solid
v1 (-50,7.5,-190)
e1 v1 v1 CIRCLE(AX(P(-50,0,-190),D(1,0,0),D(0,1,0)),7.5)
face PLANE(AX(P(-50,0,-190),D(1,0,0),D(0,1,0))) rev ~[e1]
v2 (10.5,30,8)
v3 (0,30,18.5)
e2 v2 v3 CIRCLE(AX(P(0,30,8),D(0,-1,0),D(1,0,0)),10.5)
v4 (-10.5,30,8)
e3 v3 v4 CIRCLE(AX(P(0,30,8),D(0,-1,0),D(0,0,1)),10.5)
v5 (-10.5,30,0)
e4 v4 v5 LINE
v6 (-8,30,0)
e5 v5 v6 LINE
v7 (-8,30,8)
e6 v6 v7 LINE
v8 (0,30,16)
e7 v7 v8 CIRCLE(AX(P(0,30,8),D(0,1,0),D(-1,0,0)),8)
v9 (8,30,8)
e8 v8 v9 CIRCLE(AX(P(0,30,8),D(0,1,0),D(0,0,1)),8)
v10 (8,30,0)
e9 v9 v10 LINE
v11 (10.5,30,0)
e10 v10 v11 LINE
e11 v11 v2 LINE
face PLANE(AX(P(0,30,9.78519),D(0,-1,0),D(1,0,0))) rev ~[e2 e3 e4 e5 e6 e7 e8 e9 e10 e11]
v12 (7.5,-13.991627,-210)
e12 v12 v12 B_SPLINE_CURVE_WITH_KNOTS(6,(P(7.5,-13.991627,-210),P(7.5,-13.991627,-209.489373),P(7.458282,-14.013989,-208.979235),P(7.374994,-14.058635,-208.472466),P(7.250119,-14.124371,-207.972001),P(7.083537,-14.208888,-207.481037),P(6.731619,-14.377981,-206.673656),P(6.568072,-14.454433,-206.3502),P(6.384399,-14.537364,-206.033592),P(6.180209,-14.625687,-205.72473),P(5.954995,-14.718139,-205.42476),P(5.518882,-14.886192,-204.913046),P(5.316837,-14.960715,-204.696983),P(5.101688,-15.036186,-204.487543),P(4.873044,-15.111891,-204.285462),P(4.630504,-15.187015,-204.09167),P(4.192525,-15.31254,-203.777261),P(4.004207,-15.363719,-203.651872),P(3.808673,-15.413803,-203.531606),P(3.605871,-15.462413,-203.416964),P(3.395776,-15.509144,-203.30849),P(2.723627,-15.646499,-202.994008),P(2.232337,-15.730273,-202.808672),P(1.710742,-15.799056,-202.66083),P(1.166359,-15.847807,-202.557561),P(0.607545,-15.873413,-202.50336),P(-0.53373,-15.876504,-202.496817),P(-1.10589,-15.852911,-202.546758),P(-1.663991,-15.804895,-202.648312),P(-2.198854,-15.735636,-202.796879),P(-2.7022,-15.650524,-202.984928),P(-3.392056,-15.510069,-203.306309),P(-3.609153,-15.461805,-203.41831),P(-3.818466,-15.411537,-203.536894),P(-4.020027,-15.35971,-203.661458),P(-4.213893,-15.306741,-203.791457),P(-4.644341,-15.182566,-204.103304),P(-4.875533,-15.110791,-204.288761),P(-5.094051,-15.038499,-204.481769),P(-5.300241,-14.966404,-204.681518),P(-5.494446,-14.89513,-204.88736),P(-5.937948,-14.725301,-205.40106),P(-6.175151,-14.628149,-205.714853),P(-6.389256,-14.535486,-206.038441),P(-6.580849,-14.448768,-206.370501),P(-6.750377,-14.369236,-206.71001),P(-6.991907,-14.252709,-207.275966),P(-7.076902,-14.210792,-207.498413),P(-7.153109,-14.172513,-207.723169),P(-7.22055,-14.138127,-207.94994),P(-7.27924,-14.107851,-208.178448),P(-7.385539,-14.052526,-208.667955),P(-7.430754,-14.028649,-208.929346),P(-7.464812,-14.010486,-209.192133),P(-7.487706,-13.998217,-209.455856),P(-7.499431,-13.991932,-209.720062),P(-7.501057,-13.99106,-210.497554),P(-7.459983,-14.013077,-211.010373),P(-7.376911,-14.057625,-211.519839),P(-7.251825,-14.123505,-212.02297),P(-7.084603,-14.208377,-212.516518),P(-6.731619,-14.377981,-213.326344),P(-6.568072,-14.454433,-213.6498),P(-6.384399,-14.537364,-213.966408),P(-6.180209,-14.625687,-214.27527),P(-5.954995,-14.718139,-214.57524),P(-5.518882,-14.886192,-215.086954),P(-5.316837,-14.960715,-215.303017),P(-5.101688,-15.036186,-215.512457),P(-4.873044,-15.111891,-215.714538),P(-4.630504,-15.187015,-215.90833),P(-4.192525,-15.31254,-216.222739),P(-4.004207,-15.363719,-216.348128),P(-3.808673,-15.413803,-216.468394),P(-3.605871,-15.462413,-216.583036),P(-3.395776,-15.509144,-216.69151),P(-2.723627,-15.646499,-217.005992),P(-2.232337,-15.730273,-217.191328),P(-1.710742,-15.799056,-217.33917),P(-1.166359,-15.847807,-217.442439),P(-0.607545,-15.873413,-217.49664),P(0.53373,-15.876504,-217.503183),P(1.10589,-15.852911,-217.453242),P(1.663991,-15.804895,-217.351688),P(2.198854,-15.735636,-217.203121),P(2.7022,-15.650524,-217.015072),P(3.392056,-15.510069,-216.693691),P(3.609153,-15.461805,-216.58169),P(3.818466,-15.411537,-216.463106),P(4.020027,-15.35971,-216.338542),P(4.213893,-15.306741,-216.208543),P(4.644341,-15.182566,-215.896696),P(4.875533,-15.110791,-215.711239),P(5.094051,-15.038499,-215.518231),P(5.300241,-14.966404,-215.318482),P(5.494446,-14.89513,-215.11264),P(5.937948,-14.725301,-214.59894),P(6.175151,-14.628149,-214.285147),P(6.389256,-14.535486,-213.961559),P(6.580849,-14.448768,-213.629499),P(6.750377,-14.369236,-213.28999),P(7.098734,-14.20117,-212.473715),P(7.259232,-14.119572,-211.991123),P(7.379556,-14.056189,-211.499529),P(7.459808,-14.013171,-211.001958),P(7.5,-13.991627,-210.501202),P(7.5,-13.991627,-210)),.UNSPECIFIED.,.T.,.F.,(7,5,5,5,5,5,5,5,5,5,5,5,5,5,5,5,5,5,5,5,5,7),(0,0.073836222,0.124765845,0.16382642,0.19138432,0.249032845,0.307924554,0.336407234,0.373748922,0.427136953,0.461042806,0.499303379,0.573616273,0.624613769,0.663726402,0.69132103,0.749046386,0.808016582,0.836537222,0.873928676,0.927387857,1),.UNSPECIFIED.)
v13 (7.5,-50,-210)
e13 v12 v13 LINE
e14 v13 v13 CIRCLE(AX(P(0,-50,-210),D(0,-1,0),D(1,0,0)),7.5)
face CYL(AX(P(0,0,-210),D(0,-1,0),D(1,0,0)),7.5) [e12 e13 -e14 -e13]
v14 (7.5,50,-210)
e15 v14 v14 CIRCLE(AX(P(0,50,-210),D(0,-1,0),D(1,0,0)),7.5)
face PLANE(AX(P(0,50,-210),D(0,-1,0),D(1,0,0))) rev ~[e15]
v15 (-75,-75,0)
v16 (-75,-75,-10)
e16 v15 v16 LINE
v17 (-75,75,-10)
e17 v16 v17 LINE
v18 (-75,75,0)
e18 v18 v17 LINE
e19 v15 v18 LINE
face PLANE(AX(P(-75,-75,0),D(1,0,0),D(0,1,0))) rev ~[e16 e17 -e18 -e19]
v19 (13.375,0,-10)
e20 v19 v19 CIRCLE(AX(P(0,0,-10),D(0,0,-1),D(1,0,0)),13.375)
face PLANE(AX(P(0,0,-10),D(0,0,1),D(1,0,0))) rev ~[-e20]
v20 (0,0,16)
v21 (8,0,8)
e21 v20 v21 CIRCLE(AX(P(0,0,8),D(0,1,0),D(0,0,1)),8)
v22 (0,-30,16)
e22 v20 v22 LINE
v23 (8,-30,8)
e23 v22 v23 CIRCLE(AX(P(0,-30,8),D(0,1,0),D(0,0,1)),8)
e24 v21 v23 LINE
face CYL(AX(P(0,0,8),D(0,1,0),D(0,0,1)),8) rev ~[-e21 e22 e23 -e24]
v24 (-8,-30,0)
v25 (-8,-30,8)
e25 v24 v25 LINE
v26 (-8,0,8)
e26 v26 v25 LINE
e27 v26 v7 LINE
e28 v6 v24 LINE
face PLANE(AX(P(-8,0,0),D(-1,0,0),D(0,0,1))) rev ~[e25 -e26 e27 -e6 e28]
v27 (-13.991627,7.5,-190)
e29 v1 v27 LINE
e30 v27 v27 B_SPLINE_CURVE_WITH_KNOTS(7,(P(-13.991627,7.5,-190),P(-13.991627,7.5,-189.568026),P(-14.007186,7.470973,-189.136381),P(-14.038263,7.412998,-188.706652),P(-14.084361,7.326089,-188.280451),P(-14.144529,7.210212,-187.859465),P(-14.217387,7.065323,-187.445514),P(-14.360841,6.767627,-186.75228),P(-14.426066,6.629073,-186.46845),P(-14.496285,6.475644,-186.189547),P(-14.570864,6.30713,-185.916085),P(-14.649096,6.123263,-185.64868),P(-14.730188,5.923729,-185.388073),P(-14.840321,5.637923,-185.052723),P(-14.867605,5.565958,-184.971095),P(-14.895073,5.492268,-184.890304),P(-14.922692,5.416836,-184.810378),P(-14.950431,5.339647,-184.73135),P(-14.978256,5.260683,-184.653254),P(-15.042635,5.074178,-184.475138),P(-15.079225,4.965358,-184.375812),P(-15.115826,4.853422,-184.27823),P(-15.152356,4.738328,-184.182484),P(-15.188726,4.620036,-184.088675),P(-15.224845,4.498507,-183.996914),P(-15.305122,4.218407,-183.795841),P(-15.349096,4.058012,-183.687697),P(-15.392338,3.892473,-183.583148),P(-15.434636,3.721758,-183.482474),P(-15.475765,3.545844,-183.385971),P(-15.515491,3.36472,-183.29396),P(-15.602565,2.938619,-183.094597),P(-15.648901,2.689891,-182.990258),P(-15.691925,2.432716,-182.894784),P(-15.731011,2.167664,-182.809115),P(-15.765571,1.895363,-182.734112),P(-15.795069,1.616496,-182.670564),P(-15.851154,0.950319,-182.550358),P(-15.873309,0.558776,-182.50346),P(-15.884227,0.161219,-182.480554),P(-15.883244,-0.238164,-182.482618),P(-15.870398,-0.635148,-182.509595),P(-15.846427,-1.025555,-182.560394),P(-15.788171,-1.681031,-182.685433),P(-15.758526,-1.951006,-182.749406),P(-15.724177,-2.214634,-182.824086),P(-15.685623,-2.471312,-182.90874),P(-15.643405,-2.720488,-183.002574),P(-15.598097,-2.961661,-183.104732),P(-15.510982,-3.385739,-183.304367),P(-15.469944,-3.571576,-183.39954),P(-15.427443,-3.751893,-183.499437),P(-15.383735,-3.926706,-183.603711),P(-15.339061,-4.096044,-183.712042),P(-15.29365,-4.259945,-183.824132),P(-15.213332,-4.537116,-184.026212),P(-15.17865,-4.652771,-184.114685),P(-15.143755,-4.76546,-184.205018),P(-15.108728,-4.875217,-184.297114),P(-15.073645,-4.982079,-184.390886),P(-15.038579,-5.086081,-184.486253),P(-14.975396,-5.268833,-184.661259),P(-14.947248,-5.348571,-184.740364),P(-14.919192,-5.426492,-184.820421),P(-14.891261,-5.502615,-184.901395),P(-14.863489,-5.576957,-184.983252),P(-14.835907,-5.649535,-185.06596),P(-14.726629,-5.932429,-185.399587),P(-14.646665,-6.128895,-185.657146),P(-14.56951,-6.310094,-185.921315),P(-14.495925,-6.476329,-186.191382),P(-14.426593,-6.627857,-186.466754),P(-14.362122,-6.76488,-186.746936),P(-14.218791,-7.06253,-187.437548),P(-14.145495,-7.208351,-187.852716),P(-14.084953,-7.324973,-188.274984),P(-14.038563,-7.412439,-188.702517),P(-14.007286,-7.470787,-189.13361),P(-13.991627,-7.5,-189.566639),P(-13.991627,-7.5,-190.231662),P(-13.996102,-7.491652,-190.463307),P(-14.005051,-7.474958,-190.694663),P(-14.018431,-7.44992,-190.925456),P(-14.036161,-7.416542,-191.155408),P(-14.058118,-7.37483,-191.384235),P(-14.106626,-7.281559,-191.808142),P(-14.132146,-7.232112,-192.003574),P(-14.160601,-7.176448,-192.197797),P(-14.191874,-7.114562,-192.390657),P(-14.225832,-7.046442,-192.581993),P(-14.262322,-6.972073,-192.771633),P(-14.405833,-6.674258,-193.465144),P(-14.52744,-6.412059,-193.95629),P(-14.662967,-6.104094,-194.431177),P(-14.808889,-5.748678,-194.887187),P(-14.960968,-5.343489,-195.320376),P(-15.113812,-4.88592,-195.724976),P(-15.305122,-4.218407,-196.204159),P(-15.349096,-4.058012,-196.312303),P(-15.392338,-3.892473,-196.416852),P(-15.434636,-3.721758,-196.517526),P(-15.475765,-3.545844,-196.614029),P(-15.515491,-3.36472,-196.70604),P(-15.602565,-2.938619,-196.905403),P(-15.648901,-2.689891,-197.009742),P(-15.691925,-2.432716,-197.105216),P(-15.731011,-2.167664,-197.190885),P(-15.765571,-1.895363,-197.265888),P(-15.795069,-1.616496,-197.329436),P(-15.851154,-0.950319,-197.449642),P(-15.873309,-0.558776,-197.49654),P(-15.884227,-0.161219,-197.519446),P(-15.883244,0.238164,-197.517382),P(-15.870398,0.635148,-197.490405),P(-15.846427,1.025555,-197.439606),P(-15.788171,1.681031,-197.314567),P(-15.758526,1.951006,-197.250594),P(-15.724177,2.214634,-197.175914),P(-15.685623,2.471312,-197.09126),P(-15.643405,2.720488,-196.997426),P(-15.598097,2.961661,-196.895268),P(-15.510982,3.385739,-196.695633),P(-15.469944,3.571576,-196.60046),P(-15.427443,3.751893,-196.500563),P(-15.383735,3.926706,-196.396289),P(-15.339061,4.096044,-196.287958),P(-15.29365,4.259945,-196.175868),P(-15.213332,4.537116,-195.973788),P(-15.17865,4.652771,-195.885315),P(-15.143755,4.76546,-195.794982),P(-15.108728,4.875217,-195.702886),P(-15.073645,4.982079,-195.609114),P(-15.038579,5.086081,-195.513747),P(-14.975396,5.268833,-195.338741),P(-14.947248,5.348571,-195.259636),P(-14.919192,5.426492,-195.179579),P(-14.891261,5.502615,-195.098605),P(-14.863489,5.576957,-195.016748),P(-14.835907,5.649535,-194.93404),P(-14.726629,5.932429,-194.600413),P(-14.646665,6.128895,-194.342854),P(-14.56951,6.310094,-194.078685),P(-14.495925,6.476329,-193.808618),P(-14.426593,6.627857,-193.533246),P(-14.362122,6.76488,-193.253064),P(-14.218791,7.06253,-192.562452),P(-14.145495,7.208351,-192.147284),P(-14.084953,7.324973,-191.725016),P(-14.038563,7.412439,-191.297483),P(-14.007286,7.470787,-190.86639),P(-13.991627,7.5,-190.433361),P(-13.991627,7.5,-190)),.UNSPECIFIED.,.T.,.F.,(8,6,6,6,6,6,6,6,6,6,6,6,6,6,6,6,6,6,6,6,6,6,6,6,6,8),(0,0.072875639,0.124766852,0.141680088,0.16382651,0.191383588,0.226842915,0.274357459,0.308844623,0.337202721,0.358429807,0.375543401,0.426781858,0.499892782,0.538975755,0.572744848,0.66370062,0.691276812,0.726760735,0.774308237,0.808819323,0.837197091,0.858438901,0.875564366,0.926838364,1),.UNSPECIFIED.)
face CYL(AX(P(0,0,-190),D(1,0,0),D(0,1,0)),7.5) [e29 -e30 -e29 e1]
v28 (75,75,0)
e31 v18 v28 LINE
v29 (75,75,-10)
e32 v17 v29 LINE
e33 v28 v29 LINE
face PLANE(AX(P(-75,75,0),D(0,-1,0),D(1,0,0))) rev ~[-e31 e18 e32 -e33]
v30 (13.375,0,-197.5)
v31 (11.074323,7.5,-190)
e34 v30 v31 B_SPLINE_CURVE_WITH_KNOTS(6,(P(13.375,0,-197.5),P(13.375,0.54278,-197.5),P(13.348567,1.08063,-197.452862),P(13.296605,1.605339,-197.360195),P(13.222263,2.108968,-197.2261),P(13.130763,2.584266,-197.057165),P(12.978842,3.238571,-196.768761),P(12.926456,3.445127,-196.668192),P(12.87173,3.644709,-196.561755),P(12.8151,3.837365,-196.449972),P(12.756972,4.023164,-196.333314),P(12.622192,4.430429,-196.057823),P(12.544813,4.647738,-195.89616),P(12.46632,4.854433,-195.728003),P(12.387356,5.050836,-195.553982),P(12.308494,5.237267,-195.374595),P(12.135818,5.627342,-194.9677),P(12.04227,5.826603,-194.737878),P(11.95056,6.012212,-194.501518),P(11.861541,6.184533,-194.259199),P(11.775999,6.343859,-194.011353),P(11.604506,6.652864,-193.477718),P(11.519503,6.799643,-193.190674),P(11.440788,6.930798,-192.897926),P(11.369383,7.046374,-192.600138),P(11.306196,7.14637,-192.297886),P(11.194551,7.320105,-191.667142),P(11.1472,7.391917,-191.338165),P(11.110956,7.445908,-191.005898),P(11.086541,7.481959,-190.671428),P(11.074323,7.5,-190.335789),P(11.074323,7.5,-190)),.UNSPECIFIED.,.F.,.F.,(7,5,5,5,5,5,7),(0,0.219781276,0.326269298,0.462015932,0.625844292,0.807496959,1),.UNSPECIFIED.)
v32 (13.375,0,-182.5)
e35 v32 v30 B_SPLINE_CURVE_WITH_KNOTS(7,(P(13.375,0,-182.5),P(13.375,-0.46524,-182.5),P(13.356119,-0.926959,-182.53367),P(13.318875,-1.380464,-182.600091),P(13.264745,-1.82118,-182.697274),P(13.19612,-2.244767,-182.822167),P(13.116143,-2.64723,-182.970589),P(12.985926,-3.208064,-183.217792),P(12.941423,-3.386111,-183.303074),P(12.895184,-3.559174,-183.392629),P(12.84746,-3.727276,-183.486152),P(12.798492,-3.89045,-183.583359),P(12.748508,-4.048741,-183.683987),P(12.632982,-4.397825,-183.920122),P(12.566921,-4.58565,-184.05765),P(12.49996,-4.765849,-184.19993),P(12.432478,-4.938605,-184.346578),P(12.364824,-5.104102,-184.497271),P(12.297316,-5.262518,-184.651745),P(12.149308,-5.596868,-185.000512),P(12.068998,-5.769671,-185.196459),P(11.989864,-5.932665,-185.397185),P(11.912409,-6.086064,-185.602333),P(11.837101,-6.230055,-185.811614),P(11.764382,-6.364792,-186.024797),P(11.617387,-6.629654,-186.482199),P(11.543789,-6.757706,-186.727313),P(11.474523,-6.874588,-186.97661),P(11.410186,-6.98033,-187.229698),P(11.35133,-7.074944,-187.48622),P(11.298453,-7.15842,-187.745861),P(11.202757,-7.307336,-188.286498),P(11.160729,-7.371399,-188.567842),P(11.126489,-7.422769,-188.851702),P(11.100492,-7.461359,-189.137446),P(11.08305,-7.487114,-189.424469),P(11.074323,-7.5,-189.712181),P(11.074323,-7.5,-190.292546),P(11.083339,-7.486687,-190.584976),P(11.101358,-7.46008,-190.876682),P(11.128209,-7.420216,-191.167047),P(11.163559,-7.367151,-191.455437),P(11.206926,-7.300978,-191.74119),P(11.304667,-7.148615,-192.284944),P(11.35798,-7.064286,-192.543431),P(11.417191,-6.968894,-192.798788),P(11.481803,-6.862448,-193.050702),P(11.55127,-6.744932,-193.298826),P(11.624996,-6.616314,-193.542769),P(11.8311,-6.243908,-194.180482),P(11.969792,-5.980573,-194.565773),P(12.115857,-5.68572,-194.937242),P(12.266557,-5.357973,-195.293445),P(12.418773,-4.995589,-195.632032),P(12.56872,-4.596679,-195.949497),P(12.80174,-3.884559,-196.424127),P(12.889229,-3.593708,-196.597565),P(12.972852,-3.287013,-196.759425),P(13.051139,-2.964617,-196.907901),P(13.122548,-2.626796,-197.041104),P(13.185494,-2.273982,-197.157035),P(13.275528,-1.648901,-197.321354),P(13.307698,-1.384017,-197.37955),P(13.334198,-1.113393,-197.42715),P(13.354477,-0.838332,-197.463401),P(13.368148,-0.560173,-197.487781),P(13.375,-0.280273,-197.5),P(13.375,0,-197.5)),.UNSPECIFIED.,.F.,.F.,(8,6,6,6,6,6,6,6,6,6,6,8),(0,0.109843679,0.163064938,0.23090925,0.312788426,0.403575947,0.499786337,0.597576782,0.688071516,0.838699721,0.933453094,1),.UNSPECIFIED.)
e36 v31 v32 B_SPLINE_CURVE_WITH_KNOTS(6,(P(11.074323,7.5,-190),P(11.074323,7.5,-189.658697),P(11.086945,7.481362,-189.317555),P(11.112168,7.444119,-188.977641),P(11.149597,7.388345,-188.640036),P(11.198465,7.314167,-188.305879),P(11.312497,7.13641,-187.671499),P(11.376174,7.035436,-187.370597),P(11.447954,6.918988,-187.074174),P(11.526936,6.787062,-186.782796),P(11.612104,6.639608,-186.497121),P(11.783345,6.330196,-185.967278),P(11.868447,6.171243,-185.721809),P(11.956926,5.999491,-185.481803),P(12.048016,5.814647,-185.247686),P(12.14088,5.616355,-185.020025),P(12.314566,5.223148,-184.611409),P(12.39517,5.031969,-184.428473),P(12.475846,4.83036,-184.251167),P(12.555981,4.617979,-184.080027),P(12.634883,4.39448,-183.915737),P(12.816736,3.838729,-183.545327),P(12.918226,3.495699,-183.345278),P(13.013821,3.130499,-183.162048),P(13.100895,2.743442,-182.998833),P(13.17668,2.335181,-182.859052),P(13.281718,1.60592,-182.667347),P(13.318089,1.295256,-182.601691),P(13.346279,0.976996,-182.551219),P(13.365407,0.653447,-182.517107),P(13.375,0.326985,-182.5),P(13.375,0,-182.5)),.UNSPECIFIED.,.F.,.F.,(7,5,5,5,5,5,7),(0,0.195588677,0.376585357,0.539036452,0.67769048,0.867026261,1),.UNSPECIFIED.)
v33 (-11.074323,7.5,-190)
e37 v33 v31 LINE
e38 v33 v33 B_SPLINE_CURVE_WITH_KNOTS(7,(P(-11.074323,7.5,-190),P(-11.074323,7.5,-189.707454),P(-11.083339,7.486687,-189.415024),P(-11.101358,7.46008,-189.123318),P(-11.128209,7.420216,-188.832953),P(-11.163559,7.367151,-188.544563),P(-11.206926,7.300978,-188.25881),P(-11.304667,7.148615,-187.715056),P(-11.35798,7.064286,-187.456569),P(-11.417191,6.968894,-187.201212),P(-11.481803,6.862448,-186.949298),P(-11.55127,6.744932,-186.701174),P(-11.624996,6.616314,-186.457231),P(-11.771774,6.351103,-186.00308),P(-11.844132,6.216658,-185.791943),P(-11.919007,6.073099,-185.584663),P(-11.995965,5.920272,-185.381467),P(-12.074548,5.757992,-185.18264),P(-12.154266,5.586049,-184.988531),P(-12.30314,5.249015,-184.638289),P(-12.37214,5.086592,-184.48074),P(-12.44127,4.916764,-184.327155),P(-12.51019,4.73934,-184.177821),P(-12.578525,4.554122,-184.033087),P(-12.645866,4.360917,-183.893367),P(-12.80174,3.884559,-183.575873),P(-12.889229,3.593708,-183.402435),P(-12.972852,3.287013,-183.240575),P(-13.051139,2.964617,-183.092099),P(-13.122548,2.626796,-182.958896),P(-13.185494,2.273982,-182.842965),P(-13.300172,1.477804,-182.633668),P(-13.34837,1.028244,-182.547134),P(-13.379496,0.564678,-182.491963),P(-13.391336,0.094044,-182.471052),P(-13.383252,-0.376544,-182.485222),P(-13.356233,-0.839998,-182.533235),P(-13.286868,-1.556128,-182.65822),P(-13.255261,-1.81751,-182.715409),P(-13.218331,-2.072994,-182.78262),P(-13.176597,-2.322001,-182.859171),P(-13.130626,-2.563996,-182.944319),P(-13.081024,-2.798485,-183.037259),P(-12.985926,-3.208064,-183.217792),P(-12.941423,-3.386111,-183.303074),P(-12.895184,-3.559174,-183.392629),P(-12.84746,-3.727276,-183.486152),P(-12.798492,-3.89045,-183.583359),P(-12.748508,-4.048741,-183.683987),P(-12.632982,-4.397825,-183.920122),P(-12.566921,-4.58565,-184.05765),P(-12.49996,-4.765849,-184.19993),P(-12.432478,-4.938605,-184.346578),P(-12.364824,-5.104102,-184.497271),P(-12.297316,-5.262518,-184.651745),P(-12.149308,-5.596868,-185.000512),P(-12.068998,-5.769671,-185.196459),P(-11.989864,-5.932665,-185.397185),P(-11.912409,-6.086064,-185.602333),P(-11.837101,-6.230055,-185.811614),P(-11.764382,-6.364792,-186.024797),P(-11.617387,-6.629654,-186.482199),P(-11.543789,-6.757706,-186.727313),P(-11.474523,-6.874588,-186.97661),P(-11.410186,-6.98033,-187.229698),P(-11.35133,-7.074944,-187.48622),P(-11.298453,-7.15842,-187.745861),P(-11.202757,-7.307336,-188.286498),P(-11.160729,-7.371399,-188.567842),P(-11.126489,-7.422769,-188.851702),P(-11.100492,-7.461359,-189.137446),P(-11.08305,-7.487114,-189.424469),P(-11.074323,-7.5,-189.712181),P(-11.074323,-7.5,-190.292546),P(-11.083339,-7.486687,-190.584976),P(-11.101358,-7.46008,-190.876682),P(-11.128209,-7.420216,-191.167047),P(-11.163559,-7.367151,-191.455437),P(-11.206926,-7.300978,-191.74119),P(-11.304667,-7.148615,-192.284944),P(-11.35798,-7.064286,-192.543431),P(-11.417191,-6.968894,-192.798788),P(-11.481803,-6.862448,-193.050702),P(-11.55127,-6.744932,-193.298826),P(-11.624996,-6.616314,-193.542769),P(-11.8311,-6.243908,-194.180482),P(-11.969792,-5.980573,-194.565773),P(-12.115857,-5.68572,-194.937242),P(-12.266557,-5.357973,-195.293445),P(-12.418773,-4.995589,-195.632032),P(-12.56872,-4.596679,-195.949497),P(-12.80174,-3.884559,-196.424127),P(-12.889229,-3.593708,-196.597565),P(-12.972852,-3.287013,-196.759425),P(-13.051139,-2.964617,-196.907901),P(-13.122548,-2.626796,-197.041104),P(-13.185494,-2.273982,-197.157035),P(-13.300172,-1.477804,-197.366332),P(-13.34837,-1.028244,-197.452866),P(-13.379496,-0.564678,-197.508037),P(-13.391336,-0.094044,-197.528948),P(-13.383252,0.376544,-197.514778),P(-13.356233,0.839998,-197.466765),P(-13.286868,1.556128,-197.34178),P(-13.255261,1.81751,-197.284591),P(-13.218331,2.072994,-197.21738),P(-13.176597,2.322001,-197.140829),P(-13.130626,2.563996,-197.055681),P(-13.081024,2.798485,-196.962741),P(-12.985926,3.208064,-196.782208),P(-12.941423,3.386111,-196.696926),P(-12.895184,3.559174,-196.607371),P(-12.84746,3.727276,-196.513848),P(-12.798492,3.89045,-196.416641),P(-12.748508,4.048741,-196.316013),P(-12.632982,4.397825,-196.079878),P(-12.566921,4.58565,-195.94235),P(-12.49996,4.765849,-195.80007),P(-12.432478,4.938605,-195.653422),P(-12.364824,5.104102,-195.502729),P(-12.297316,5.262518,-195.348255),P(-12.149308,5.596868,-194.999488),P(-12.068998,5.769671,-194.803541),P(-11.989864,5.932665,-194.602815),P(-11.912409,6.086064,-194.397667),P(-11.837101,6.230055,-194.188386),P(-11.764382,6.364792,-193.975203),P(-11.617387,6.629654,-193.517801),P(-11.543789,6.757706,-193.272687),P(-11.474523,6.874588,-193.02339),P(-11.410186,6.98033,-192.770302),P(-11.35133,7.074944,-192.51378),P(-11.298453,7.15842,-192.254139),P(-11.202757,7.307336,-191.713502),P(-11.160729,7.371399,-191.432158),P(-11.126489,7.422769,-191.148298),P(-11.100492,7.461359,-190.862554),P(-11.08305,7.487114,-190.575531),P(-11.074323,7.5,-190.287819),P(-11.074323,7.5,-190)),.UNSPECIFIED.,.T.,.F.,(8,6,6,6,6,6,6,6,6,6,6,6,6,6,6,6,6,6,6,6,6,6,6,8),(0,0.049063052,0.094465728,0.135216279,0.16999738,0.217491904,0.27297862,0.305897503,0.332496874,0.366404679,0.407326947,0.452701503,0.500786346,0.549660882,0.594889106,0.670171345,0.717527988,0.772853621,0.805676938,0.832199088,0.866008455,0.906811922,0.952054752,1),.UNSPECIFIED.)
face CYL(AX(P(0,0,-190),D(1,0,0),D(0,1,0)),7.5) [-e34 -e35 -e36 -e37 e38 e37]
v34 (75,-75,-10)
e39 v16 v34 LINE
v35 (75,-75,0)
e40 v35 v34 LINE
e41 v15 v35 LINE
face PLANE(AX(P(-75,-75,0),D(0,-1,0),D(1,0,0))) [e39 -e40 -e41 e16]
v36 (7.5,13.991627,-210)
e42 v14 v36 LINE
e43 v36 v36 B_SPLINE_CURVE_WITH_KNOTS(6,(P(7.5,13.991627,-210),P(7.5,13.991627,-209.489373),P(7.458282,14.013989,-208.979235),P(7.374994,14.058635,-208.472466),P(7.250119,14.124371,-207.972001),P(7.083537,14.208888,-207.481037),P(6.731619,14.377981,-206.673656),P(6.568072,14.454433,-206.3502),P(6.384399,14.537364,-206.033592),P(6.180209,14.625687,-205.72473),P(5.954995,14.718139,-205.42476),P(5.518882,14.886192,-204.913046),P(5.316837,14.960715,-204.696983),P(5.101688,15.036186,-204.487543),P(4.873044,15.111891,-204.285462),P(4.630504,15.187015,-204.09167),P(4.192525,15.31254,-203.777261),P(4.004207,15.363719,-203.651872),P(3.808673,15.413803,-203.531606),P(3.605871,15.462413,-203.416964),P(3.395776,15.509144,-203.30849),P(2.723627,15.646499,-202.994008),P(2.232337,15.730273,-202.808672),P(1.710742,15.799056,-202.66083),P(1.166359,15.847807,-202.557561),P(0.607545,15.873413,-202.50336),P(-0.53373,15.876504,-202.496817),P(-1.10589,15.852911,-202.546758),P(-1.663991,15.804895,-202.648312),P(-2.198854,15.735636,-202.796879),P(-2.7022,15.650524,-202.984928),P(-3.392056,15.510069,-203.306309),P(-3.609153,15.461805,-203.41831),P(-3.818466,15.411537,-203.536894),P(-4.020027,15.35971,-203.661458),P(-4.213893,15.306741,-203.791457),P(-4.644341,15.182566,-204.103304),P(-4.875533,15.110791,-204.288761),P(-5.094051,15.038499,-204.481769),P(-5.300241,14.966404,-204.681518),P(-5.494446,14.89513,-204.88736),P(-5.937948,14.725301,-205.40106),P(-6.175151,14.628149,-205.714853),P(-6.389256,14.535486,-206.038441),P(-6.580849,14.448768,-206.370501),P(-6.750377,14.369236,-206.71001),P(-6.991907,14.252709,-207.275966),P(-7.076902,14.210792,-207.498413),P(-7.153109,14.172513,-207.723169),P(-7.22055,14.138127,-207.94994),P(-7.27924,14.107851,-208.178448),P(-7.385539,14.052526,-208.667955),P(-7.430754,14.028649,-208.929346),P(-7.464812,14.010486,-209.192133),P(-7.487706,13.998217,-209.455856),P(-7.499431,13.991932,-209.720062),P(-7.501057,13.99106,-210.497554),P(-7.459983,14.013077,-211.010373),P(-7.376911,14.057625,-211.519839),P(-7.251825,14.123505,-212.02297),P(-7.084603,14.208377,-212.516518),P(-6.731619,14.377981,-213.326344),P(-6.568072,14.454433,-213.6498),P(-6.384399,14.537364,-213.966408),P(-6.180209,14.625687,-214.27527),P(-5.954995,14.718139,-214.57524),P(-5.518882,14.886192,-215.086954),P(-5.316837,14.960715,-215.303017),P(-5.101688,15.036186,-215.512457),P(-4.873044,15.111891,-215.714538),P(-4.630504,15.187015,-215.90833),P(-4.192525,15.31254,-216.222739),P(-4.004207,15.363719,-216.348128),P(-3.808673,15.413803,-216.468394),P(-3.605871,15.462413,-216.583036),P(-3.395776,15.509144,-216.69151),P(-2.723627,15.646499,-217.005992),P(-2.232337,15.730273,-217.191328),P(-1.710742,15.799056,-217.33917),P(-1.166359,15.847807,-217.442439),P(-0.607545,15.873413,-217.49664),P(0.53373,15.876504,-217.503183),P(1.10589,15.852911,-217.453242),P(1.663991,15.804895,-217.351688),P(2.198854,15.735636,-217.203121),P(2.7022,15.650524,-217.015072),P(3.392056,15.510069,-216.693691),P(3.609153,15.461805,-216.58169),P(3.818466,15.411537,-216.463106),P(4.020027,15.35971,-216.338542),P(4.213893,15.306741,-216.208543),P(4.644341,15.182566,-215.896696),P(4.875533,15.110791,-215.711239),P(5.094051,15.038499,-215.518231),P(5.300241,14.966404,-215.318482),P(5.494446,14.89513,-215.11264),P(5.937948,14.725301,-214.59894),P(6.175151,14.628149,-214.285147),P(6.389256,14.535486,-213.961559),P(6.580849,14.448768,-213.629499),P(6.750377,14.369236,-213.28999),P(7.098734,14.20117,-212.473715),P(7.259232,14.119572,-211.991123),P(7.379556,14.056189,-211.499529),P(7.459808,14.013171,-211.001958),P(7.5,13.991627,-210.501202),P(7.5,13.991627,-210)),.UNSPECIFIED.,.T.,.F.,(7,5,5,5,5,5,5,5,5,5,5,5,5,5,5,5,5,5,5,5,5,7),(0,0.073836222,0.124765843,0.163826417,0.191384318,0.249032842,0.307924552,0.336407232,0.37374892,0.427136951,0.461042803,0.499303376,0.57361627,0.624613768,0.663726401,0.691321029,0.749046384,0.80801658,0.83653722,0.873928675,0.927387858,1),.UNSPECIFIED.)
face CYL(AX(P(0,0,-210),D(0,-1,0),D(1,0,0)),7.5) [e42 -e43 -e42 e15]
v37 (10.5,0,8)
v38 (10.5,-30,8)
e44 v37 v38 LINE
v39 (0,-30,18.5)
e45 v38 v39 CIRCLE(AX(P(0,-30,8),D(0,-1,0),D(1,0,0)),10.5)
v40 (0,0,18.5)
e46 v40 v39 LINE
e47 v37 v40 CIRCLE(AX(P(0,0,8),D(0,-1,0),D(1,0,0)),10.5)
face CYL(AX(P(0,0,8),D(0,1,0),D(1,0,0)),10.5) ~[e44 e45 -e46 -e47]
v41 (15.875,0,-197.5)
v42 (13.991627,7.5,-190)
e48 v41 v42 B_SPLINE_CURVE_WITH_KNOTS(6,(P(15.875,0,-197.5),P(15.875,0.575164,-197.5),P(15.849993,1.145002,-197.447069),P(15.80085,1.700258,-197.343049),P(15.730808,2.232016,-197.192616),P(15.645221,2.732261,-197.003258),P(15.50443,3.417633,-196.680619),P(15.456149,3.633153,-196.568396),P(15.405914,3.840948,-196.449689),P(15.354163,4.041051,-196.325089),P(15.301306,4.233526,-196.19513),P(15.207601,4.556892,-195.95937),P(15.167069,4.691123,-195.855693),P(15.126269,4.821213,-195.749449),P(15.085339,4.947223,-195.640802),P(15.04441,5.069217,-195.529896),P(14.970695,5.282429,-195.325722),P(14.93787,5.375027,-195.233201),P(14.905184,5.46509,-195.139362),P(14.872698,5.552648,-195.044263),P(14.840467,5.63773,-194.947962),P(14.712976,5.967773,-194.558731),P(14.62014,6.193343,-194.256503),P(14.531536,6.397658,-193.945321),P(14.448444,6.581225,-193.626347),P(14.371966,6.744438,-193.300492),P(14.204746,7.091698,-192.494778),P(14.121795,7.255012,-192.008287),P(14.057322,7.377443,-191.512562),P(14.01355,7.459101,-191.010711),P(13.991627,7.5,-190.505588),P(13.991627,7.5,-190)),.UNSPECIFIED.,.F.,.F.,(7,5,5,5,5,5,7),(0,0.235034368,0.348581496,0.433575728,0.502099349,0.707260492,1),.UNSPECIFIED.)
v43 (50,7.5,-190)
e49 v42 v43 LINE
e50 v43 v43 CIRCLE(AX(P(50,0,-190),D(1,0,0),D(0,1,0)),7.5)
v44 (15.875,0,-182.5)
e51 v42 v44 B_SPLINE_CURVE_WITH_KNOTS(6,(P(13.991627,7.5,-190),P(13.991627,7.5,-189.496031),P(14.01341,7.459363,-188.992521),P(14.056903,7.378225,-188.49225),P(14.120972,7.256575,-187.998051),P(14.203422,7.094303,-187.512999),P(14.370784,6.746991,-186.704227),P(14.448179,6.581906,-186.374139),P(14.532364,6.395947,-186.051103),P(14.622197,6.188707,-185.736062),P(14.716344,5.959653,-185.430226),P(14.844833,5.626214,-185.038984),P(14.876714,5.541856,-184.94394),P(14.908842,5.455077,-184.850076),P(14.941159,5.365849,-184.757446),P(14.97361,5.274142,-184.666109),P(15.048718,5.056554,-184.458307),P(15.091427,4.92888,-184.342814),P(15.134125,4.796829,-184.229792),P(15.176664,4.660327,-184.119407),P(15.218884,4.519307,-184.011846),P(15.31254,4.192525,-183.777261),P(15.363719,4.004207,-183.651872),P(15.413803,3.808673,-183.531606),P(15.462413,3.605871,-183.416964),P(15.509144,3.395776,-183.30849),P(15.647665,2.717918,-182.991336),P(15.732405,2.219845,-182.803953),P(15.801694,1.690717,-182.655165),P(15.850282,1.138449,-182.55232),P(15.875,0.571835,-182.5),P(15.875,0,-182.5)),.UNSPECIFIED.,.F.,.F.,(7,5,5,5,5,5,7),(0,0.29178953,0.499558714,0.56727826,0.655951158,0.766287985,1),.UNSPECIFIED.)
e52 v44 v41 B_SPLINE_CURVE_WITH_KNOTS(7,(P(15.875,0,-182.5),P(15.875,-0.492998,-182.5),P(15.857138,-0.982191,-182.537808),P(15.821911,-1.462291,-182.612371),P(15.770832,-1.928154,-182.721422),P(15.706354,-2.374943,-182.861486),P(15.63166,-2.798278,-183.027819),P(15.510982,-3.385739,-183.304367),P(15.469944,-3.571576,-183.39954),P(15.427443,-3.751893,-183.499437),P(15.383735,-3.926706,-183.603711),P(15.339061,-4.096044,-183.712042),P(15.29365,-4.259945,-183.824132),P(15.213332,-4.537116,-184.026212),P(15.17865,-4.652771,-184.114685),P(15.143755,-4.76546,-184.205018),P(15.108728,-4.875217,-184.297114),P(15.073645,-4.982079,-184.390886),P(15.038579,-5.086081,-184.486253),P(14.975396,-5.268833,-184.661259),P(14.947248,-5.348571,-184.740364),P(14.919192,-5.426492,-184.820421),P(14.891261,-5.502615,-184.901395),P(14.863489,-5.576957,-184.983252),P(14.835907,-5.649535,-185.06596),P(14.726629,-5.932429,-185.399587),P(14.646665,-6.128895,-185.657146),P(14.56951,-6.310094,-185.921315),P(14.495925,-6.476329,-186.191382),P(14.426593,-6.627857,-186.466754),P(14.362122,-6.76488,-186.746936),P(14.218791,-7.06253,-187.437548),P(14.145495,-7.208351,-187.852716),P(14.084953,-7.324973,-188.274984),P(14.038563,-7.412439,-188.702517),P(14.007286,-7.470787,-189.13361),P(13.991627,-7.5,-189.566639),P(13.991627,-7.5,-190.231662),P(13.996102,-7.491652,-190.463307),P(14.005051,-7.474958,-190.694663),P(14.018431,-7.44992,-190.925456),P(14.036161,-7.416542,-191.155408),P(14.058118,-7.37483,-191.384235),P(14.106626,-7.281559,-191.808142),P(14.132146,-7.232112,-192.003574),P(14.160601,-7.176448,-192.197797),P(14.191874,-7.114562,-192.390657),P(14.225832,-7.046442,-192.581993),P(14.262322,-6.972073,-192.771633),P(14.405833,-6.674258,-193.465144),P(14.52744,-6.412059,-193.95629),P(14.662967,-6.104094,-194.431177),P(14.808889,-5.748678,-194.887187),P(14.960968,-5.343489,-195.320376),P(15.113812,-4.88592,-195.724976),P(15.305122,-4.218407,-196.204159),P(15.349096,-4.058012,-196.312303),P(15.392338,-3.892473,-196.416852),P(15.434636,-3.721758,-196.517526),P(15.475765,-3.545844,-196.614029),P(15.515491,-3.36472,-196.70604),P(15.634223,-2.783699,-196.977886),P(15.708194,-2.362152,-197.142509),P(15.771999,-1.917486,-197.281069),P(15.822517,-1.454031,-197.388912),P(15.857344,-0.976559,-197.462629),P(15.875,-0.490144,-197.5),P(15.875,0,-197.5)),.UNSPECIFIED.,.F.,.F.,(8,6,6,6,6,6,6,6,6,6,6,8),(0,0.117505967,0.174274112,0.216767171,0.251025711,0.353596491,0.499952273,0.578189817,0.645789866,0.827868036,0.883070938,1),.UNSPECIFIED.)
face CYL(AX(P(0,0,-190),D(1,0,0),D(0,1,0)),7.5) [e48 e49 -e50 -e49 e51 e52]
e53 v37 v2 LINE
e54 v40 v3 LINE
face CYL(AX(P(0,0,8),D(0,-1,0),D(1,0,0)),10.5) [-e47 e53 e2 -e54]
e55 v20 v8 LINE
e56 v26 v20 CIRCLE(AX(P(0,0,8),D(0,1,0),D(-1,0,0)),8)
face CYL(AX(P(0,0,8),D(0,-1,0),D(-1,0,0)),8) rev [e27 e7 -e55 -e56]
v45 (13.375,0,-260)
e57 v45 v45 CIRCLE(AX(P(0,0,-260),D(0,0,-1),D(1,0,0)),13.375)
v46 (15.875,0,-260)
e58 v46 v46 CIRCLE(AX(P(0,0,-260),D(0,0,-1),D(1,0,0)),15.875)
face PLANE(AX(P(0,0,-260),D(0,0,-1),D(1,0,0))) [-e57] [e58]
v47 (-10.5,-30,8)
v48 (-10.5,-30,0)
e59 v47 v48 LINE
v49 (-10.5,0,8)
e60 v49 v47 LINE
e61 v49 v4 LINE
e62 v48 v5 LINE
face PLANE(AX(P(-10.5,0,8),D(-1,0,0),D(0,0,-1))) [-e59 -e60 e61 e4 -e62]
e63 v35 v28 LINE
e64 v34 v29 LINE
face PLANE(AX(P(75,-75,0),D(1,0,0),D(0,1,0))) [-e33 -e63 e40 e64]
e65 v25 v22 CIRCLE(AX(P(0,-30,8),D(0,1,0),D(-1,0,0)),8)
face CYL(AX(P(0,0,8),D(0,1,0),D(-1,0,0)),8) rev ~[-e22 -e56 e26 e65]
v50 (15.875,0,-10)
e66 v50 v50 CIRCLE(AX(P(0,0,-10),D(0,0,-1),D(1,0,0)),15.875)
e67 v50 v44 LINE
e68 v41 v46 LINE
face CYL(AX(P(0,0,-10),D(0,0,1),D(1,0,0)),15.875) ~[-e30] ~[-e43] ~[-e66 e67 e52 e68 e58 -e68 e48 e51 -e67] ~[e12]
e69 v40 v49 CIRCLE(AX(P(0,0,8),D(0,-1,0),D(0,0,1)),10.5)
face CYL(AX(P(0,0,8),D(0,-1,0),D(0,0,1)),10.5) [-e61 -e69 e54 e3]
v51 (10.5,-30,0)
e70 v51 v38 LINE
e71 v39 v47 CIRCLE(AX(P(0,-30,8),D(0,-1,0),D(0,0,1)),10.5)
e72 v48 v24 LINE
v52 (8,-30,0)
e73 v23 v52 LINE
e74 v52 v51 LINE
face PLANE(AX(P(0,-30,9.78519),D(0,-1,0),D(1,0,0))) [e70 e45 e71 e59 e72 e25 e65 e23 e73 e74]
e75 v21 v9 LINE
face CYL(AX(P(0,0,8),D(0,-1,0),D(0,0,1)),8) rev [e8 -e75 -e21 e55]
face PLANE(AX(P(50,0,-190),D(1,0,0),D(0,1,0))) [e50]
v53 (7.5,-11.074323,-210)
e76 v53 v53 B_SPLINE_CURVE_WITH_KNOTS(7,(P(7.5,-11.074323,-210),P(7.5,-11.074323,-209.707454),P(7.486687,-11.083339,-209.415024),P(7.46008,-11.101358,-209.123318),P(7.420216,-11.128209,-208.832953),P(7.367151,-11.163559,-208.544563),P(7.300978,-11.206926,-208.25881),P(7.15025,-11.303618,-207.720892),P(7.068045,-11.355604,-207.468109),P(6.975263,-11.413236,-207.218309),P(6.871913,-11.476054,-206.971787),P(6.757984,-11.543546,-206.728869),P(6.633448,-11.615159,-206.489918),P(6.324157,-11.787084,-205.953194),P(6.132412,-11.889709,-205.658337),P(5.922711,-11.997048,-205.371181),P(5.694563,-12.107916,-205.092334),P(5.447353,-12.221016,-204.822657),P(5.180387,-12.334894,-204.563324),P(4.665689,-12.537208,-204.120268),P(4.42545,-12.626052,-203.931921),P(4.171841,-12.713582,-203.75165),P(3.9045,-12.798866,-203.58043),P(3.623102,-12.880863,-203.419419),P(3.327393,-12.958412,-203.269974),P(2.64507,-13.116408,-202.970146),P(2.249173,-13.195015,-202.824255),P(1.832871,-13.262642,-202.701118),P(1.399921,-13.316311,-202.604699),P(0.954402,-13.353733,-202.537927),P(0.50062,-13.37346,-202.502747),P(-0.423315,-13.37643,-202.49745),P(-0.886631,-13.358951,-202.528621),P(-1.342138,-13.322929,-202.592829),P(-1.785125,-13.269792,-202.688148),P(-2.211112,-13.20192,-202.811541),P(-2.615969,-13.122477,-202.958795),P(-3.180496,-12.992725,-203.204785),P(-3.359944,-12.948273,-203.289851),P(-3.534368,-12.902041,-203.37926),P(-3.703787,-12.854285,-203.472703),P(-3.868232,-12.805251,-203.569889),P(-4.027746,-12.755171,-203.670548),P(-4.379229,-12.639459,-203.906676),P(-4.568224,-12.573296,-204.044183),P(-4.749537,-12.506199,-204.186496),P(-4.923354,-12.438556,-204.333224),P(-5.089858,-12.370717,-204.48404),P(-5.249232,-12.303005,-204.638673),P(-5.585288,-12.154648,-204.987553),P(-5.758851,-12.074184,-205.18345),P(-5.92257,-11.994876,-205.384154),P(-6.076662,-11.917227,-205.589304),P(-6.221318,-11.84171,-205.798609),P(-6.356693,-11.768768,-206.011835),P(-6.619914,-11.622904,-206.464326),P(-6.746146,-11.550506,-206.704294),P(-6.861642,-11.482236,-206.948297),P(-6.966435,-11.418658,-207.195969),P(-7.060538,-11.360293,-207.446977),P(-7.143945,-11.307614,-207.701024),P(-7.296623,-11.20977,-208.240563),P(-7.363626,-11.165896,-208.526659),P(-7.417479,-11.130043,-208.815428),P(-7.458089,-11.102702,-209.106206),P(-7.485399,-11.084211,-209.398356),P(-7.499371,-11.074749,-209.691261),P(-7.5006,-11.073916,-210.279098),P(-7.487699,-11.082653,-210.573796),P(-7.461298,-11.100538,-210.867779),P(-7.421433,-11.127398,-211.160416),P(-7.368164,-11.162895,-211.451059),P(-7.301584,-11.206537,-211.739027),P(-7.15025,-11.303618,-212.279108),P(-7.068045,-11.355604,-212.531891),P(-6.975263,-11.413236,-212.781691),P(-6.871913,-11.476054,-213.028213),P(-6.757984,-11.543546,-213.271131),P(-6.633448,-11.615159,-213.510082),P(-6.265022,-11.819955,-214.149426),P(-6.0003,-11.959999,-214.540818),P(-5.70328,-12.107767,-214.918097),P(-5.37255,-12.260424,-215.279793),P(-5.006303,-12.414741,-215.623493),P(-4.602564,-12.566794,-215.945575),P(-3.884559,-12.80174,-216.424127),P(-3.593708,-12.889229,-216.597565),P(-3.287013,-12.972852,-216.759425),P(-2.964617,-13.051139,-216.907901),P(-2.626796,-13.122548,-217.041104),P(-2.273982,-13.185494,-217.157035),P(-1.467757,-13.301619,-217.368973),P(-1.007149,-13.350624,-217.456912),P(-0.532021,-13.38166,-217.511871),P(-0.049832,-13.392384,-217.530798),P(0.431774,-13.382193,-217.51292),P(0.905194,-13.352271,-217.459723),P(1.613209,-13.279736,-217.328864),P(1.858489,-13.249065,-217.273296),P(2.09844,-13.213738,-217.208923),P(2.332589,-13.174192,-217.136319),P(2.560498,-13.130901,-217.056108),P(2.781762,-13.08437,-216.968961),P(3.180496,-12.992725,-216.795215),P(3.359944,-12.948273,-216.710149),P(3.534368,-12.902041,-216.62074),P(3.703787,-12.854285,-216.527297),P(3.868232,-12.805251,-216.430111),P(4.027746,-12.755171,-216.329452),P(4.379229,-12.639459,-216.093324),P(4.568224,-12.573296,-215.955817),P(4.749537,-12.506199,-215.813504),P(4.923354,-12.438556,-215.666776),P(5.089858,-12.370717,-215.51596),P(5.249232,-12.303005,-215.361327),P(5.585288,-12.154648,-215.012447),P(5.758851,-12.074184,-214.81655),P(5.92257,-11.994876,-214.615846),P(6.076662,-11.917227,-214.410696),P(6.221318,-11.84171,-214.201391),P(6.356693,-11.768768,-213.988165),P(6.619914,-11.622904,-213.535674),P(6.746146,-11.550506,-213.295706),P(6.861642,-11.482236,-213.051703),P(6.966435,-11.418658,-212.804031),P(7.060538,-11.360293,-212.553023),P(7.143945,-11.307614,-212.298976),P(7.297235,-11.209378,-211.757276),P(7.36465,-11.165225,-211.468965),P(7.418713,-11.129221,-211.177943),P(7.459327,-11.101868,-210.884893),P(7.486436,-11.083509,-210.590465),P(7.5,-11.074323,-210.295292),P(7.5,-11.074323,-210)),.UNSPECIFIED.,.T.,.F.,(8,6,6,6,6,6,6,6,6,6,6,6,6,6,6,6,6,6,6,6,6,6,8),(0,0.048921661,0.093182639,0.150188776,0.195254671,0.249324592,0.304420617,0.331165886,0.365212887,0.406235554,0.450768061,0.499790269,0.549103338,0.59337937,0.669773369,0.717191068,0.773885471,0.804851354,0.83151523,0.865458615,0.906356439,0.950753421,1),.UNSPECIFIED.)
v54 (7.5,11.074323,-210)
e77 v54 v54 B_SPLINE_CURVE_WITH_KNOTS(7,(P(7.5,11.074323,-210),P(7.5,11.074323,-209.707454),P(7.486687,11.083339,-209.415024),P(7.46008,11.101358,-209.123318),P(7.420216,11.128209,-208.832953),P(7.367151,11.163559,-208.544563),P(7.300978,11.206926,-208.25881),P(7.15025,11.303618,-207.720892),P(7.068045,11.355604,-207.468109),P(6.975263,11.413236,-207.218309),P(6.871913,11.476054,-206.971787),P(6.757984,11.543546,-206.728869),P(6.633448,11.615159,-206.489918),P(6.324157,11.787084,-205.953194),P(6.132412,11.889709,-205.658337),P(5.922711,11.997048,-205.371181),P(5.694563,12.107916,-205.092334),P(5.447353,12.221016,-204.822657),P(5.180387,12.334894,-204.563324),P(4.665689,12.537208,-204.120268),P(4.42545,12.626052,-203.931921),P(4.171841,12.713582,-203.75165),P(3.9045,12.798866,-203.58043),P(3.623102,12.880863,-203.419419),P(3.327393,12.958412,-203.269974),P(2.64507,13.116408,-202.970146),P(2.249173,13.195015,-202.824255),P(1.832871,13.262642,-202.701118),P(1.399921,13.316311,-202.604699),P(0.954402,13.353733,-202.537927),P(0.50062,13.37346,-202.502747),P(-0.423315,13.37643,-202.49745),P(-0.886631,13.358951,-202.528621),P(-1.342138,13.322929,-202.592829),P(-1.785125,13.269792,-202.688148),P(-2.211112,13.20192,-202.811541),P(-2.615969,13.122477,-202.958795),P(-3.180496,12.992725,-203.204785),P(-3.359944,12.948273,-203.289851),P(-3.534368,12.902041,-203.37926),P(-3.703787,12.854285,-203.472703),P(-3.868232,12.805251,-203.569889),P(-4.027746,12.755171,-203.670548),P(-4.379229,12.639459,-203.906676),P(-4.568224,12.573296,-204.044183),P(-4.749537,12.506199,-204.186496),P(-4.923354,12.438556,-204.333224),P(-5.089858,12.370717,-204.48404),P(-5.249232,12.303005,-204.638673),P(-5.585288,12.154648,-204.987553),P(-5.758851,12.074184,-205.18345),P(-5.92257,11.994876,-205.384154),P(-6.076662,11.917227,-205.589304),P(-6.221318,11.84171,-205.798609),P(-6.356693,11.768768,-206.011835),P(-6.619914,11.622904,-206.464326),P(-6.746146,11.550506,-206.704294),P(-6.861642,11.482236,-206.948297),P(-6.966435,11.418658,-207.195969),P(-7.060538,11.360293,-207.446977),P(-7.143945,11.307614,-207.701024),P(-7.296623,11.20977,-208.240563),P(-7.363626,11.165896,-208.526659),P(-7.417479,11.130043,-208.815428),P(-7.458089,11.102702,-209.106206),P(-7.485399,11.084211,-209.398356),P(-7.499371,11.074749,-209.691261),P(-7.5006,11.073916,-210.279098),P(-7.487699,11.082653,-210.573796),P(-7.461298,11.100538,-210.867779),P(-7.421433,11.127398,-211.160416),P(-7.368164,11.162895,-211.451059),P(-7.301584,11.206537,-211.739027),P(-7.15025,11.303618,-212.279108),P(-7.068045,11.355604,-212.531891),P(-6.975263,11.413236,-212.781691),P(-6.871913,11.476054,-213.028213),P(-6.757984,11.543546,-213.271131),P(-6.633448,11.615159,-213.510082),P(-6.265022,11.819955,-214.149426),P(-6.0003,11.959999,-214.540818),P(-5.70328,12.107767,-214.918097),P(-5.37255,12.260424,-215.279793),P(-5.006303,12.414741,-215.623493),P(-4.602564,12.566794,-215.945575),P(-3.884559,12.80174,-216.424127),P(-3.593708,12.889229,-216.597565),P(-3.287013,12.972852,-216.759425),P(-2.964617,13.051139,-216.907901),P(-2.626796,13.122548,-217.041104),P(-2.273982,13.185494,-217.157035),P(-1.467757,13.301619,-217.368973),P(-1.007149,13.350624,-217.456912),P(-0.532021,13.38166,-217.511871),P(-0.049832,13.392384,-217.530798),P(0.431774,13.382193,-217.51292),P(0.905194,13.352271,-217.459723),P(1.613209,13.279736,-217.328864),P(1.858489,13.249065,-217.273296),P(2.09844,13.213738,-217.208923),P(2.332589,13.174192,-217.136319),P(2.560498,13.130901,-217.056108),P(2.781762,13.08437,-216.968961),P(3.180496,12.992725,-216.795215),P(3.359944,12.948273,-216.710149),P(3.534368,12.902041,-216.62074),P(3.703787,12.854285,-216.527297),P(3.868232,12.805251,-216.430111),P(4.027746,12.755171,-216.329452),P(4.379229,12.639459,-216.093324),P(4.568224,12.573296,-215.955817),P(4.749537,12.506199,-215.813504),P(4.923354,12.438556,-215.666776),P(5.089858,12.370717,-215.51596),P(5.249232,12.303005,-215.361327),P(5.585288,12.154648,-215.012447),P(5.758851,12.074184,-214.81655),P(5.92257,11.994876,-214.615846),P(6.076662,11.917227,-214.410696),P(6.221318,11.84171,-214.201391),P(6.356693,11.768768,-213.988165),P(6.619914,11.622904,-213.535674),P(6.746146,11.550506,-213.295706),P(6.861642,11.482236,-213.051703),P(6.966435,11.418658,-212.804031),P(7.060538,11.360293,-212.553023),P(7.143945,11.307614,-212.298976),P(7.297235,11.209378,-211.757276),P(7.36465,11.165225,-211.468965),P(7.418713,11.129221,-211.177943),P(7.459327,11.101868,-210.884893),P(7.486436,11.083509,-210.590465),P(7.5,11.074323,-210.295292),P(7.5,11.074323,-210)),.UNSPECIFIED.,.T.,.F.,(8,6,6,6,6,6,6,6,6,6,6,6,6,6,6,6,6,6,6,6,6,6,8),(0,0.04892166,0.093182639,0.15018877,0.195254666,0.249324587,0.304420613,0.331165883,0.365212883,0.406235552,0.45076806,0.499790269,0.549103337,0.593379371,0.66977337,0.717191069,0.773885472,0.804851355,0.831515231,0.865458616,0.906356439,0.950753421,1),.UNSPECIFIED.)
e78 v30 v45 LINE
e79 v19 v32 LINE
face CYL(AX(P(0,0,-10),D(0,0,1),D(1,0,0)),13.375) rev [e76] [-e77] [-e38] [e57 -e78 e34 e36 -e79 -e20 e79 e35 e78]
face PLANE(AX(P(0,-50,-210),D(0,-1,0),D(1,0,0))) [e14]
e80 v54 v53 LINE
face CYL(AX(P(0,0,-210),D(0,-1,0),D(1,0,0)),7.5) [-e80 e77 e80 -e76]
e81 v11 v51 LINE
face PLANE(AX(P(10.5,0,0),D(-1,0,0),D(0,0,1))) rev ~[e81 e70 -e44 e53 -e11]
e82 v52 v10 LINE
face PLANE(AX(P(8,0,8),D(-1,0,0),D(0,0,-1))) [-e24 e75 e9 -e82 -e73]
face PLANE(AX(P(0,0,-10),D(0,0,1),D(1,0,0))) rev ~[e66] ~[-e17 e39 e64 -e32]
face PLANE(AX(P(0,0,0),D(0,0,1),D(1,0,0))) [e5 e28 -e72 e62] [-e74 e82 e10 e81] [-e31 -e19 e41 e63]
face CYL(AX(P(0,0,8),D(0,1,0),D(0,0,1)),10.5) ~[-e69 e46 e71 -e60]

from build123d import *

# Parameters (mm, degrees)
F0_W     = 150
F0_H     = 150
F1_DEPTH = 10
F2_R     = 15.875
F2_R_2   = 13.375
F3_DEPTH = 250
F4_R     = 7.5
F5_DEPTH = 50
F6_R     = 7.5
F7_DEPTH = 50
F9_DEPTH = 30


# Not quite as in the source:
# - a feature names something its author has since deleted; it is built from what else it names


with BuildPart() as f1:
    # F0 (on Top) → F1 (new body)
    with BuildSketch(Plane.XY):
        Rectangle(F0_W, F0_H)
    extrude(amount=-F1_DEPTH)

    # F2 (on face) → F3 (join)
    with BuildSketch(Plane(origin=(0, 0, -10), x_dir=(1, 0, 0), z_dir=(0, 0, -1))):
        Circle(F2_R)
        Circle(F2_R_2, mode=Mode.SUBTRACT)
    extrude(amount=F3_DEPTH)

    # F4 (on Front) → F5 (join, symmetric)
    with BuildSketch(Plane.XZ):
        with Locations((0, -210)):
            Circle(F4_R)
    extrude(amount=F5_DEPTH, both=True)

    # F6 (on Right) → F7 (join, symmetric)
    with BuildSketch(Plane.YZ):
        with Locations((0, -190)):
            Circle(F6_R)
    extrude(amount=F7_DEPTH, both=True)

    # F8 (on Front) → F9 (join, symmetric)
    with BuildSketch(Plane.XZ):
        with BuildLine():
            Line((-10.5, 8), (-10.5, 0))
            Line((-10.5, 0), (-8, 0))
            Line((-8, 0), (-8, 8))
            ThreePointArc((-8, 8), (-5.6568542495, 13.6568542495), (0, 16))
            ThreePointArc((0, 16), (5.6568542495, 13.6568542495), (8, 8))
            Line((8, 8), (8, 0))
            Line((8, 0), (10.5, 0))
            Line((10.5, 0), (10.5, 8))
            ThreePointArc((10.5, 8), (7.4246212025, 15.4246212025), (0, 18.5))
            ThreePointArc((0, 18.5), (-7.4246212025, 15.4246212025), (-10.5, 8))
        make_face()
    extrude(amount=F9_DEPTH, both=True)


solid = f1.part
